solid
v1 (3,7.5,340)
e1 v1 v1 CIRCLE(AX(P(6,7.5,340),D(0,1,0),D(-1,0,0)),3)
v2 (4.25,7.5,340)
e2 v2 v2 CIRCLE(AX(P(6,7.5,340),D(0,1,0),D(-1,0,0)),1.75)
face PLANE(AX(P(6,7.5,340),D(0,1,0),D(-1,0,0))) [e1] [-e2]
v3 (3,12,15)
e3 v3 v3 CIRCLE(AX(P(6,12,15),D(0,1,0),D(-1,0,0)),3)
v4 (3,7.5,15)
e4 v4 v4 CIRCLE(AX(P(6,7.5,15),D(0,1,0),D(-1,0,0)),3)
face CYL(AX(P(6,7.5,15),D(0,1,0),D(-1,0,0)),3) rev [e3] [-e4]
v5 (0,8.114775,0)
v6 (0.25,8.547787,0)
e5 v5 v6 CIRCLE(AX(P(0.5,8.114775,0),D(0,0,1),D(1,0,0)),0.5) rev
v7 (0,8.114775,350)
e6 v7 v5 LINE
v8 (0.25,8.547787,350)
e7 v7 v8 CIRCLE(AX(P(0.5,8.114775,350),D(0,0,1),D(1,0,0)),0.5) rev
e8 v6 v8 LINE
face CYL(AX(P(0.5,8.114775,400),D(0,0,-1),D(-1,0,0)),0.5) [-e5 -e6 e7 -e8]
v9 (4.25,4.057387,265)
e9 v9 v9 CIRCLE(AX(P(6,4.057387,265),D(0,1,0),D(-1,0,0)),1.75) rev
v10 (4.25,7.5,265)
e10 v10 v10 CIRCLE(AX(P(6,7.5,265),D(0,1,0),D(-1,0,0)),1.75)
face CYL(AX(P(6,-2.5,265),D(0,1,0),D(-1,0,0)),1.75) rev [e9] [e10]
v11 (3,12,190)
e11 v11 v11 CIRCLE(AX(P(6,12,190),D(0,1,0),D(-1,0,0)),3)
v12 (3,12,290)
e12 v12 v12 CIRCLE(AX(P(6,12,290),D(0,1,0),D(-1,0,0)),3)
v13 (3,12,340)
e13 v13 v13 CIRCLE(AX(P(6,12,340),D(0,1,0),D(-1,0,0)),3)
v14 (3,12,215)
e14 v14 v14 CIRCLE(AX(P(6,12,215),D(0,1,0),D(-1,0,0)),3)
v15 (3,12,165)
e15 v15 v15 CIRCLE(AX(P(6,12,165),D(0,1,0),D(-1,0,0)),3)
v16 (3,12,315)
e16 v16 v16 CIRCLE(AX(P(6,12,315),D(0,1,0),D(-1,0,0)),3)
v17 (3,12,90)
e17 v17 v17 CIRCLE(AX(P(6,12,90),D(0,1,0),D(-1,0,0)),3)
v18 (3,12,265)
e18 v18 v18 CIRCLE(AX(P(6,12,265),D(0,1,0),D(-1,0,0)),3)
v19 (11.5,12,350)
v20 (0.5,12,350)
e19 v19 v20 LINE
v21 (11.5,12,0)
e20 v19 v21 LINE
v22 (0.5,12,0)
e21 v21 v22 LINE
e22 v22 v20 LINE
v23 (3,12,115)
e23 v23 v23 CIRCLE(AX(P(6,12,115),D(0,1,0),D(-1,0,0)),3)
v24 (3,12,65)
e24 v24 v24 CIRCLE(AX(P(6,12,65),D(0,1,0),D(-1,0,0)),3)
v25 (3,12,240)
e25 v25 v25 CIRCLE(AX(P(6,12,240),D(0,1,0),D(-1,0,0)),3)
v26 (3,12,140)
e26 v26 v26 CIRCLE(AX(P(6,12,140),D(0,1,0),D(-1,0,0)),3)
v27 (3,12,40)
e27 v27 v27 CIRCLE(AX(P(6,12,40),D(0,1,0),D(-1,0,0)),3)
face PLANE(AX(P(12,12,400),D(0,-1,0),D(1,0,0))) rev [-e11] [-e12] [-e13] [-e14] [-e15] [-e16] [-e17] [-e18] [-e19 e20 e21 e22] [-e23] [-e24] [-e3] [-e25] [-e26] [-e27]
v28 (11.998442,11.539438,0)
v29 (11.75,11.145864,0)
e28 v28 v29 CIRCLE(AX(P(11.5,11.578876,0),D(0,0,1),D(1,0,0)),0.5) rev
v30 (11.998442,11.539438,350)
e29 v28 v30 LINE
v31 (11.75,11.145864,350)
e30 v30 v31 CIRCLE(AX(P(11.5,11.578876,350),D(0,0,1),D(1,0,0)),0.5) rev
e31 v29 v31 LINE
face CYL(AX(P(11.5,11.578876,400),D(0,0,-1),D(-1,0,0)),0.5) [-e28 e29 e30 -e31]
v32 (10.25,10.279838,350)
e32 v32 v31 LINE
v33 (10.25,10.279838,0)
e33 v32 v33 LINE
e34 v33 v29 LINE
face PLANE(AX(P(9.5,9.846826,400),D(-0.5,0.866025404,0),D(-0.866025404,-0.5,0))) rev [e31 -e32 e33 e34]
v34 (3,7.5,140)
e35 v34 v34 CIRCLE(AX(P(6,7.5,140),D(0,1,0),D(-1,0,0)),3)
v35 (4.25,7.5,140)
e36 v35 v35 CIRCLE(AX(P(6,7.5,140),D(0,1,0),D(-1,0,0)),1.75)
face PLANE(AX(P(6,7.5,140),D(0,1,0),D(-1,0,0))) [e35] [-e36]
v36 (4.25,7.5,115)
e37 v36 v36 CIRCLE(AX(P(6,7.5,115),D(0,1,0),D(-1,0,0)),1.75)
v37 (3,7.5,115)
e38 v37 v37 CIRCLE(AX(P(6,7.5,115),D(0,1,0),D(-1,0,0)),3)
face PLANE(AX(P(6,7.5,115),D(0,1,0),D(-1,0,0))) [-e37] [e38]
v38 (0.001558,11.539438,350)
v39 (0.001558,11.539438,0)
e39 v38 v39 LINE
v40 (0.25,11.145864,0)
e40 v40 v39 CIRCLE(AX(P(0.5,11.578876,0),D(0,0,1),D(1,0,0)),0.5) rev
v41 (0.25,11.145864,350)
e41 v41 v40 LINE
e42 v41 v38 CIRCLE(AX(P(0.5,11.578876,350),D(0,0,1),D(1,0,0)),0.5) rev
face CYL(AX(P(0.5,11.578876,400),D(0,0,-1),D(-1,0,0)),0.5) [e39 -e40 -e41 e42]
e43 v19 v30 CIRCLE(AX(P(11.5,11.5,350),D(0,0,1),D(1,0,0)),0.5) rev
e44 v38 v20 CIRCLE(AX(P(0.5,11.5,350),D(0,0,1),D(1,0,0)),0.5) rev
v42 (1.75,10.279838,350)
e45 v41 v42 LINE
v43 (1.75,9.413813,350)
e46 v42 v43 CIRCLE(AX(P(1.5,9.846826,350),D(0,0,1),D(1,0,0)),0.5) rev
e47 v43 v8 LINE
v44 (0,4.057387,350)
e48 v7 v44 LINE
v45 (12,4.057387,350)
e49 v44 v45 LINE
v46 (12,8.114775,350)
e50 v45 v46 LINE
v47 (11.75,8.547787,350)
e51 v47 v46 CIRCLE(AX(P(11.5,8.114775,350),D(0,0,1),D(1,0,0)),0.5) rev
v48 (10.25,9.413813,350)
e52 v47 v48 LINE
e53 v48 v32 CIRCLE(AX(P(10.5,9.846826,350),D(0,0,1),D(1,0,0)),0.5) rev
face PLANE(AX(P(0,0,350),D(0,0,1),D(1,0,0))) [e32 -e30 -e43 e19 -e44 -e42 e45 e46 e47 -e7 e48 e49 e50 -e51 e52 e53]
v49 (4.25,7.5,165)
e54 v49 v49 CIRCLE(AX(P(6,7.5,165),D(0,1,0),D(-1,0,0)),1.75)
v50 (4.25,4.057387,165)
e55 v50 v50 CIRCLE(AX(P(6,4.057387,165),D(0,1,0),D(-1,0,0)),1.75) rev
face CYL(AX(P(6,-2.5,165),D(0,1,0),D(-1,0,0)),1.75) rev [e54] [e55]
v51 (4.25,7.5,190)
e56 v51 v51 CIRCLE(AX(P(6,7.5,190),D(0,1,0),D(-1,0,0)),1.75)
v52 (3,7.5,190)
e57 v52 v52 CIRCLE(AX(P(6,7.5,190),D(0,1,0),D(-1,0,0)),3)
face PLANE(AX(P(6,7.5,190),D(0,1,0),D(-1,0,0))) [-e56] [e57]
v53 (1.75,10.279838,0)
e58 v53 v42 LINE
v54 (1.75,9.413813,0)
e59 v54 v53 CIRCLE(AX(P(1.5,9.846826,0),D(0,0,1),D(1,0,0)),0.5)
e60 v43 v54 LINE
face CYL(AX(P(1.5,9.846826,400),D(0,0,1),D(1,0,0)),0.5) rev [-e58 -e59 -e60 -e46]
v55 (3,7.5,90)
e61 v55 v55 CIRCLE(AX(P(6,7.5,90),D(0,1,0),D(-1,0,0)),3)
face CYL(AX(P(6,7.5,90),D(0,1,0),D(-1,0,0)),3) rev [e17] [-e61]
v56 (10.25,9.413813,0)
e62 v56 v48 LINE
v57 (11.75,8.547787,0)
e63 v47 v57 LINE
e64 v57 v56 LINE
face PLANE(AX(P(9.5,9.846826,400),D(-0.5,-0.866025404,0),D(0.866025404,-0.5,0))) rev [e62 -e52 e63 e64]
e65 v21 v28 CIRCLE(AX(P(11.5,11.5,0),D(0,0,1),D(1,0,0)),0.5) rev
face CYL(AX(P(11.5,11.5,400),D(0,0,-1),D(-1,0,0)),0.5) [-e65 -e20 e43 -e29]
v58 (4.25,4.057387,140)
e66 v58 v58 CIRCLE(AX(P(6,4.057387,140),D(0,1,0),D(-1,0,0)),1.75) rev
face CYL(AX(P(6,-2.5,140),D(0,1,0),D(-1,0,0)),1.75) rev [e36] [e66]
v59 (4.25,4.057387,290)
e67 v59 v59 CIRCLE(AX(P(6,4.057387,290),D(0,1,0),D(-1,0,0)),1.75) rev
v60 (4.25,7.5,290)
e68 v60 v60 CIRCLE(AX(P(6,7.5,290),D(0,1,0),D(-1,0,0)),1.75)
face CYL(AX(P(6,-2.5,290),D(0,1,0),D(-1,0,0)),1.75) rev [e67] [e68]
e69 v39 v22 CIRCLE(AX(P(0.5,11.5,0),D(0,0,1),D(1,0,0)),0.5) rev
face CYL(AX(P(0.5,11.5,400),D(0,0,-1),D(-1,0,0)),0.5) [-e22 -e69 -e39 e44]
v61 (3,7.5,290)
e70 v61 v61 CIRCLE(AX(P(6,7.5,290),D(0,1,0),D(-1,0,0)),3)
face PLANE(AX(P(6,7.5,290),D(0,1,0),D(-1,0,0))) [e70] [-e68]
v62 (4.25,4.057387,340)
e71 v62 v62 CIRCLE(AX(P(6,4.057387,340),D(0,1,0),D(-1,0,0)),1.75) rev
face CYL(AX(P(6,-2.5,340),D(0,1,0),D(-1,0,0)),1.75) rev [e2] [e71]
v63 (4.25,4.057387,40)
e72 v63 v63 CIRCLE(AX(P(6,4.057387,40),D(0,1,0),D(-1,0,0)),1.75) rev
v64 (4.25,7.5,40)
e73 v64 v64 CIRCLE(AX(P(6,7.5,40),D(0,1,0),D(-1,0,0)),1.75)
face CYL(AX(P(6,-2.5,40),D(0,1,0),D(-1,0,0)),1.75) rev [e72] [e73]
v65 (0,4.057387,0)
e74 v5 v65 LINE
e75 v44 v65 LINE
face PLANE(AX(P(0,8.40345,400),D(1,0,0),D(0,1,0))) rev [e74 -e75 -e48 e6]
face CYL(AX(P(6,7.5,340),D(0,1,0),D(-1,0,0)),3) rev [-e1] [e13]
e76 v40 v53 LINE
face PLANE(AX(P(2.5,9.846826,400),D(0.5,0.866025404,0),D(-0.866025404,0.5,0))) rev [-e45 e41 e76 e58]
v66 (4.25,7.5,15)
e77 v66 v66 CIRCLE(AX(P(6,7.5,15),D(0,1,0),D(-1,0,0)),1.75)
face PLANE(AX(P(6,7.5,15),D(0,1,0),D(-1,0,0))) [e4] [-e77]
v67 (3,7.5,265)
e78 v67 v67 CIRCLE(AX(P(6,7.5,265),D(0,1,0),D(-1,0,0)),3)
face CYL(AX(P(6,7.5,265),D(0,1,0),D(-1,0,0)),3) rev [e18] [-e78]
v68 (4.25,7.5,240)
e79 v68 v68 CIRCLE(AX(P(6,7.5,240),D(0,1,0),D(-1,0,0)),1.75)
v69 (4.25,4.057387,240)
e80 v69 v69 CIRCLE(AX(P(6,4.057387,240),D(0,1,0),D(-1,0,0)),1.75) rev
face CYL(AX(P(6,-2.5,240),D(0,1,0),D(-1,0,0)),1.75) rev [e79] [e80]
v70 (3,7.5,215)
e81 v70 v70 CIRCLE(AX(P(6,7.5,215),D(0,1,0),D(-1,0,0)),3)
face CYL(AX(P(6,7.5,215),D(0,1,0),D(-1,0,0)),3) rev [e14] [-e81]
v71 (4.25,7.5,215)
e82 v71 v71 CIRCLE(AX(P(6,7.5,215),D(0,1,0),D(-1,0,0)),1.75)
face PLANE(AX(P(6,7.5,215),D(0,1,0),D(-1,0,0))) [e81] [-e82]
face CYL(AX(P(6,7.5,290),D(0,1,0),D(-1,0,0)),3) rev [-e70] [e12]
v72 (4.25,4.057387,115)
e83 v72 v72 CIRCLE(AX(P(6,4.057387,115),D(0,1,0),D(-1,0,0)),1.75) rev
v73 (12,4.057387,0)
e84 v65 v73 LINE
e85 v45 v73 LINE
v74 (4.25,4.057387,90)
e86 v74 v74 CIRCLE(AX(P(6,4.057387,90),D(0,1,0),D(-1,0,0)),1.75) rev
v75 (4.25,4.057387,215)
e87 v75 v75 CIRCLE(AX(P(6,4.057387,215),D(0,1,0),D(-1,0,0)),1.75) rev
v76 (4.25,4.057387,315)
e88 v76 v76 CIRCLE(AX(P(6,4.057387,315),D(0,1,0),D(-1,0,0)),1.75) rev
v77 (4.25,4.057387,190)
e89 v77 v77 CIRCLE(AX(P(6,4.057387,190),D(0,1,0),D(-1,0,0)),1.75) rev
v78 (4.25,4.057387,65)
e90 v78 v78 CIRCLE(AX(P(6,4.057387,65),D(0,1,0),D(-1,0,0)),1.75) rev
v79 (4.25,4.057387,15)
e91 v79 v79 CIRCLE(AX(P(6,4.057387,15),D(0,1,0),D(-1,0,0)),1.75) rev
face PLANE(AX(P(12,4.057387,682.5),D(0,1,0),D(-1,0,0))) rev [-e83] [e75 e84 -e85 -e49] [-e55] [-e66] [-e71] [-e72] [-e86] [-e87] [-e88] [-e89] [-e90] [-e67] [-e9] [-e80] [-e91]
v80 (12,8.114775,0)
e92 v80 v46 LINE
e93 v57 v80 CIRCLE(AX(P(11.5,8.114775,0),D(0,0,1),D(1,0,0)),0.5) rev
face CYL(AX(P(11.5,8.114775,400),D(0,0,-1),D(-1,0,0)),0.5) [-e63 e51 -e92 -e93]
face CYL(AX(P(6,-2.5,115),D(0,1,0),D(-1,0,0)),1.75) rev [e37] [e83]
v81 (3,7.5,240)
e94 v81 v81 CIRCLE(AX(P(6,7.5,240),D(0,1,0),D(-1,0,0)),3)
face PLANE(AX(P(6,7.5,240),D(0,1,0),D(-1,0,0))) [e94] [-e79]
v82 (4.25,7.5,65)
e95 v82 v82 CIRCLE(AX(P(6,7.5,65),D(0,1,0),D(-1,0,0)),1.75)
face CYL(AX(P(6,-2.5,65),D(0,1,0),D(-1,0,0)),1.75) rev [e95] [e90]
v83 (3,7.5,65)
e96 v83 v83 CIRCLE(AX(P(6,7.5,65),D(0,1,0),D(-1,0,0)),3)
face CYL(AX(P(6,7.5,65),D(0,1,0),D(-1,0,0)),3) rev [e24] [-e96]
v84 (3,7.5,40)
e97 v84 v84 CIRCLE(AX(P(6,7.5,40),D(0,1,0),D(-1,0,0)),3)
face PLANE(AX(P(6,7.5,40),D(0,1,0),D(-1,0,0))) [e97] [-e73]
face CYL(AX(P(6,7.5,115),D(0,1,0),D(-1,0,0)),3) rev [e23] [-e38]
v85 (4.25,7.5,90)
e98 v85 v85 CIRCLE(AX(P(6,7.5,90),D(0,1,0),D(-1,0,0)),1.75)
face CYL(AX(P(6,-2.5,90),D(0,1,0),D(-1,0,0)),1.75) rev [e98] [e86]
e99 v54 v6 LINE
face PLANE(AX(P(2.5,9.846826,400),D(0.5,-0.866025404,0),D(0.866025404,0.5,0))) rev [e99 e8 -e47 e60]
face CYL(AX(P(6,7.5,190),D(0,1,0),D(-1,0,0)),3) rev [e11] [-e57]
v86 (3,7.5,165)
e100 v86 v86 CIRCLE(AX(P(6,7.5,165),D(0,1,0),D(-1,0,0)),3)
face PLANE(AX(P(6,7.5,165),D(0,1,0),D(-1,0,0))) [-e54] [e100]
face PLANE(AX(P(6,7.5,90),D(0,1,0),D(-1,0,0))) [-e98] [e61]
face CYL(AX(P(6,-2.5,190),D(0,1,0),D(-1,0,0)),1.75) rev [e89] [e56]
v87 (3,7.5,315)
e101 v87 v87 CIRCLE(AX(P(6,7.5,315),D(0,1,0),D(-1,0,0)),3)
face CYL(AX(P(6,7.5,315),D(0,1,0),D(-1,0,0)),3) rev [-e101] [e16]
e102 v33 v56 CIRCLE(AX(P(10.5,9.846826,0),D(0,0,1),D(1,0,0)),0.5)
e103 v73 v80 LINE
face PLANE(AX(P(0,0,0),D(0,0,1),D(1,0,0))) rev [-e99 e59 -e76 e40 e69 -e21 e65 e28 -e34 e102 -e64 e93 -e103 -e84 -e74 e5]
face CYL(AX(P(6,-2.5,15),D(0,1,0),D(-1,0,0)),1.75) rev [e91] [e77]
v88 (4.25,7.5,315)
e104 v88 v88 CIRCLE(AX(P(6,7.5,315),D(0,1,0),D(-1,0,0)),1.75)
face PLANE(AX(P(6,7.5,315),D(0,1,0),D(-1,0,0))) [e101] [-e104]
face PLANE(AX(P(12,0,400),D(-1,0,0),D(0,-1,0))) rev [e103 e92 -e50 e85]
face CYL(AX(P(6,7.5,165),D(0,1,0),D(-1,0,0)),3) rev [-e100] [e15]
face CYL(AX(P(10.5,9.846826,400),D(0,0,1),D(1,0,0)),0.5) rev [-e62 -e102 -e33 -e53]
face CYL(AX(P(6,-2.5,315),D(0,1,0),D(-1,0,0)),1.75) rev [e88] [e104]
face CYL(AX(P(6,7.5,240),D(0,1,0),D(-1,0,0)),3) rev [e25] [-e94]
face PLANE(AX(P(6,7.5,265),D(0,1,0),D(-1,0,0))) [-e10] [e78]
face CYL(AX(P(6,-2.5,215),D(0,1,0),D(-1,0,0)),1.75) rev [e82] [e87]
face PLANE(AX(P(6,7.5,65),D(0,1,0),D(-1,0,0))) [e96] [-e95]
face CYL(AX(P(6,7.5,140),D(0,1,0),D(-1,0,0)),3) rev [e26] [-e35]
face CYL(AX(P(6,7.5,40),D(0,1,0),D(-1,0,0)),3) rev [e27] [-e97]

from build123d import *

# Parameters (mm, degrees)
BOSS_EXTRUDE2_DEPTH = 400
FILLET5_R           = 0.5
SKETCH3_R           = 3
CUT_EXTRUDE2_DEPTH  = 4.5
SKETCH4_R           = 1.75
CUT_EXTRUDE3_DEPTH  = 14.5
SKETCH5_W           = 12
SKETCH5_H           = 4.057387372
CUT_EXTRUDE4_DEPTH  = 682.5
SKETCH6_W           = 13.958482149
SKETCH6_H           = 9.545138528
CUT_EXTRUDE5_DEPTH  = 50


with BuildPart() as part:
    # Sketch1 → Boss-Extrude2 (new body)
    with BuildSketch(Plane.XY):
        Polygon((0, 0), (12, 0), (12, 8.403449878), (9.5, 9.846825551), (12, 11.290201224), (12, 12), (0, 12), (0, 11.290201224), (2.5, 9.846825551), (0, 8.403449878), align=None)
    extrude(amount=BOSS_EXTRUDE2_DEPTH)

    # Fillet5
    # the kernel refuses this fillet: 0.5 mm, written as the material it adds along each edge
    with BuildSketch(Plane(origin=(2.5, 9.846825551, 0), x_dir=(-0.8660254037844382, 0.5000000000000009, 0), z_dir=(0, 0, 1)), Plane(origin=(9.5, 9.846825551, 0), x_dir=(0.8660254037844379, -0.5000000000000013, 0), z_dir=(0, 0, 1))) as fillet5_piece_1:
        with BuildLine():
            CenterArc((FILLET5_R * 1.73205080757, FILLET5_R), FILLET5_R, 150, 120)
            Line((FILLET5_R * 0.866025403784, FILLET5_R * 1.5), (0, 0))
            Line((0, 0), (FILLET5_R * 1.73205080757, 0))
        make_face()
    extrude(amount=400)
    # the kernel refuses this fillet: 0.5 mm, written as the material it takes off along each edge
    with BuildSketch(Plane(origin=(0, 8.403449878, -0.721687836), x_dir=(0, -1, 0), z_dir=(0, 0, 1))) as fillet5_2_piece_1:
        with BuildLine():
            CenterArc((FILLET5_R * 0.57735026919, FILLET5_R), FILLET5_R, 210, 60)
            Line((-FILLET5_R * 0.288675134595, FILLET5_R * 0.5), (0, 0))
            Line((0, 0), (FILLET5_R * 0.57735026919, 0))
        make_face()
    extrude(amount=401.443375673, mode=Mode.SUBTRACT)
    with BuildSketch(Plane(origin=(0, 11.290201224, -0.721687836), x_dir=(0, 1, 0), z_dir=(0, 0, 1)), Plane(origin=(12, 11.290201224, -0.721687836), x_dir=(-0.8660254037844355, -0.5000000000000052, 0), z_dir=(0, 0, 1)), Plane(origin=(12, 8.403449878, -0.721687836), x_dir=(0, -1, 0), z_dir=(0, 0, 1))) as fillet5_2_piece_2:
        with BuildLine():
            CenterArc((FILLET5_R * 0.57735026919, -FILLET5_R), FILLET5_R, 90, 60)
            Line((-FILLET5_R * 0.288675134595, -FILLET5_R * 0.5), (0, 0))
            Line((0, 0), (FILLET5_R * 0.57735026919, 0))
        make_face()
    extrude(amount=401.443375673, mode=Mode.SUBTRACT)
    with BuildSketch(Plane(origin=(0, 12, -1.25), x_dir=(1, 0, 0), z_dir=(0, 0, 1)), Plane(origin=(12, 12, -1.25), x_dir=(0, -1, 0), z_dir=(0, 0, 1))) as fillet5_2_piece_3:
        with BuildLine():
            CenterArc((FILLET5_R, -FILLET5_R), FILLET5_R, 90, 90)
            Line((0, -FILLET5_R), (0, 0))
            Line((0, 0), (FILLET5_R, 0))
        make_face()
    extrude(amount=402.5, mode=Mode.SUBTRACT)

    # Sketch3 → Cut-Extrude2 (cut)
    with BuildSketch(Plane(origin=(0, 12, 0), x_dir=(1, 0, 0), z_dir=(0, 1, 0))):
        with Locations((6, -490)):
            Circle(SKETCH3_R)
        with Locations((6, -440)):
            Circle(SKETCH3_R)
        with Locations((6, -415)):
            Circle(SKETCH3_R)
        with Locations(Location((6, -390, 0), (0, 0, 180))):
            Circle(SKETCH3_R)
        with Locations(Location((6, -365, 0), (0, 0, 180))):
            Circle(SKETCH3_R)
        with Locations(Location((6, -340, 0), (0, 0, 180))):
            Circle(SKETCH3_R)
        with Locations(Location((6, -315, 0), (0, 0, 180))):
            Circle(SKETCH3_R)
        with Locations(Location((6, -290, 0), (0, 0, 180))):
            Circle(SKETCH3_R)
        with Locations(Location((6, -265, 0), (0, 0, 180))):
            Circle(SKETCH3_R)
        with Locations(Location((6, -240, 0), (0, 0, 180))):
            Circle(SKETCH3_R)
        with Locations(Location((6, -215, 0), (0, 0, 180))):
            Circle(SKETCH3_R)
        with Locations(Location((6, -190, 0), (0, 0, 180))):
            Circle(SKETCH3_R)
        with Locations(Location((6, -165, 0), (0, 0, 180))):
            Circle(SKETCH3_R)
        with Locations(Location((6, -140, 0), (0, 0, 180))):
            Circle(SKETCH3_R)
        with Locations(Location((6, -115, 0), (0, 0, 180))):
            Circle(SKETCH3_R)
        with Locations(Location((6, -90, 0), (0, 0, 180))):
            Circle(SKETCH3_R)
        with Locations(Location((6, -65, 0), (0, 0, 180))):
            Circle(SKETCH3_R)
        with Locations(Location((6, -40, 0), (0, 0, 180))):
            Circle(SKETCH3_R)
        with Locations(Location((6, -15, 0), (0, 0, 180))):
            Circle(SKETCH3_R)
        with Locations((6, -465)):
            Circle(SKETCH3_R)
    extrude(amount=-CUT_EXTRUDE2_DEPTH, mode=Mode.SUBTRACT)

    # Sketch4 → Cut-Extrude3 (cut)
    with BuildSketch(Plane(origin=(0, 12, 0), x_dir=(1, 0, 0), z_dir=(0, 1, 0))):
        with Locations(Location((6, -15, 0), (0, 0, 180))):
            Circle(SKETCH4_R)
        with Locations(Location((6, -40, 0), (0, 0, 180))):
            Circle(SKETCH4_R)
        with Locations(Location((6, -65, 0), (0, 0, 180))):
            Circle(SKETCH4_R)
        with Locations(Location((6, -90, 0), (0, 0, 180))):
            Circle(SKETCH4_R)
        with Locations(Location((6, -115, 0), (0, 0, 180))):
            Circle(SKETCH4_R)
        with Locations(Location((6, -140, 0), (0, 0, 180))):
            Circle(SKETCH4_R)
        with Locations(Location((6, -165, 0), (0, 0, 180))):
            Circle(SKETCH4_R)
        with Locations(Location((6, -190, 0), (0, 0, 180))):
            Circle(SKETCH4_R)
        with Locations(Location((6, -215, 0), (0, 0, 180))):
            Circle(SKETCH4_R)
        with Locations(Location((6, -240, 0), (0, 0, 180))):
            Circle(SKETCH4_R)
        with Locations(Location((6, -265, 0), (0, 0, 180))):
            Circle(SKETCH4_R)
        with Locations(Location((6, -290, 0), (0, 0, 180))):
            Circle(SKETCH4_R)
        with Locations(Location((6, -315, 0), (0, 0, 180))):
            Circle(SKETCH4_R)
        with Locations(Location((6, -340, 0), (0, 0, 180))):
            Circle(SKETCH4_R)
        with Locations(Location((6, -365, 0), (0, 0, 180))):
            Circle(SKETCH4_R)
        with Locations(Location((6, -390, 0), (0, 0, 180))):
            Circle(SKETCH4_R)
        with Locations((6, -415)):
            Circle(SKETCH4_R)
        with Locations((6, -440)):
            Circle(SKETCH4_R)
        with Locations((6, -465)):
            Circle(SKETCH4_R)
        with Locations((6, -490)):
            Circle(SKETCH4_R)
    extrude(amount=-CUT_EXTRUDE3_DEPTH, mode=Mode.SUBTRACT)

    # Sketch5 → Cut-Extrude4 (cut)
    with BuildSketch(Plane(origin=(0, 0, 0), x_dir=(-1, 0, 0), z_dir=(0, 0, -1))):
        with Locations((-6, 2.028693686)):
            Rectangle(SKETCH5_W, SKETCH5_H)
    extrude(amount=-CUT_EXTRUDE4_DEPTH, mode=Mode.SUBTRACT)

    # Sketch6 → Cut-Extrude5 (cut)
    with BuildSketch(Plane.XY.offset(400)):
        with Locations((6.153953848, 7.847446167)):
            Rectangle(SKETCH6_W, SKETCH6_H)
    extrude(amount=-CUT_EXTRUDE5_DEPTH, mode=Mode.SUBTRACT)


solid = part.part
